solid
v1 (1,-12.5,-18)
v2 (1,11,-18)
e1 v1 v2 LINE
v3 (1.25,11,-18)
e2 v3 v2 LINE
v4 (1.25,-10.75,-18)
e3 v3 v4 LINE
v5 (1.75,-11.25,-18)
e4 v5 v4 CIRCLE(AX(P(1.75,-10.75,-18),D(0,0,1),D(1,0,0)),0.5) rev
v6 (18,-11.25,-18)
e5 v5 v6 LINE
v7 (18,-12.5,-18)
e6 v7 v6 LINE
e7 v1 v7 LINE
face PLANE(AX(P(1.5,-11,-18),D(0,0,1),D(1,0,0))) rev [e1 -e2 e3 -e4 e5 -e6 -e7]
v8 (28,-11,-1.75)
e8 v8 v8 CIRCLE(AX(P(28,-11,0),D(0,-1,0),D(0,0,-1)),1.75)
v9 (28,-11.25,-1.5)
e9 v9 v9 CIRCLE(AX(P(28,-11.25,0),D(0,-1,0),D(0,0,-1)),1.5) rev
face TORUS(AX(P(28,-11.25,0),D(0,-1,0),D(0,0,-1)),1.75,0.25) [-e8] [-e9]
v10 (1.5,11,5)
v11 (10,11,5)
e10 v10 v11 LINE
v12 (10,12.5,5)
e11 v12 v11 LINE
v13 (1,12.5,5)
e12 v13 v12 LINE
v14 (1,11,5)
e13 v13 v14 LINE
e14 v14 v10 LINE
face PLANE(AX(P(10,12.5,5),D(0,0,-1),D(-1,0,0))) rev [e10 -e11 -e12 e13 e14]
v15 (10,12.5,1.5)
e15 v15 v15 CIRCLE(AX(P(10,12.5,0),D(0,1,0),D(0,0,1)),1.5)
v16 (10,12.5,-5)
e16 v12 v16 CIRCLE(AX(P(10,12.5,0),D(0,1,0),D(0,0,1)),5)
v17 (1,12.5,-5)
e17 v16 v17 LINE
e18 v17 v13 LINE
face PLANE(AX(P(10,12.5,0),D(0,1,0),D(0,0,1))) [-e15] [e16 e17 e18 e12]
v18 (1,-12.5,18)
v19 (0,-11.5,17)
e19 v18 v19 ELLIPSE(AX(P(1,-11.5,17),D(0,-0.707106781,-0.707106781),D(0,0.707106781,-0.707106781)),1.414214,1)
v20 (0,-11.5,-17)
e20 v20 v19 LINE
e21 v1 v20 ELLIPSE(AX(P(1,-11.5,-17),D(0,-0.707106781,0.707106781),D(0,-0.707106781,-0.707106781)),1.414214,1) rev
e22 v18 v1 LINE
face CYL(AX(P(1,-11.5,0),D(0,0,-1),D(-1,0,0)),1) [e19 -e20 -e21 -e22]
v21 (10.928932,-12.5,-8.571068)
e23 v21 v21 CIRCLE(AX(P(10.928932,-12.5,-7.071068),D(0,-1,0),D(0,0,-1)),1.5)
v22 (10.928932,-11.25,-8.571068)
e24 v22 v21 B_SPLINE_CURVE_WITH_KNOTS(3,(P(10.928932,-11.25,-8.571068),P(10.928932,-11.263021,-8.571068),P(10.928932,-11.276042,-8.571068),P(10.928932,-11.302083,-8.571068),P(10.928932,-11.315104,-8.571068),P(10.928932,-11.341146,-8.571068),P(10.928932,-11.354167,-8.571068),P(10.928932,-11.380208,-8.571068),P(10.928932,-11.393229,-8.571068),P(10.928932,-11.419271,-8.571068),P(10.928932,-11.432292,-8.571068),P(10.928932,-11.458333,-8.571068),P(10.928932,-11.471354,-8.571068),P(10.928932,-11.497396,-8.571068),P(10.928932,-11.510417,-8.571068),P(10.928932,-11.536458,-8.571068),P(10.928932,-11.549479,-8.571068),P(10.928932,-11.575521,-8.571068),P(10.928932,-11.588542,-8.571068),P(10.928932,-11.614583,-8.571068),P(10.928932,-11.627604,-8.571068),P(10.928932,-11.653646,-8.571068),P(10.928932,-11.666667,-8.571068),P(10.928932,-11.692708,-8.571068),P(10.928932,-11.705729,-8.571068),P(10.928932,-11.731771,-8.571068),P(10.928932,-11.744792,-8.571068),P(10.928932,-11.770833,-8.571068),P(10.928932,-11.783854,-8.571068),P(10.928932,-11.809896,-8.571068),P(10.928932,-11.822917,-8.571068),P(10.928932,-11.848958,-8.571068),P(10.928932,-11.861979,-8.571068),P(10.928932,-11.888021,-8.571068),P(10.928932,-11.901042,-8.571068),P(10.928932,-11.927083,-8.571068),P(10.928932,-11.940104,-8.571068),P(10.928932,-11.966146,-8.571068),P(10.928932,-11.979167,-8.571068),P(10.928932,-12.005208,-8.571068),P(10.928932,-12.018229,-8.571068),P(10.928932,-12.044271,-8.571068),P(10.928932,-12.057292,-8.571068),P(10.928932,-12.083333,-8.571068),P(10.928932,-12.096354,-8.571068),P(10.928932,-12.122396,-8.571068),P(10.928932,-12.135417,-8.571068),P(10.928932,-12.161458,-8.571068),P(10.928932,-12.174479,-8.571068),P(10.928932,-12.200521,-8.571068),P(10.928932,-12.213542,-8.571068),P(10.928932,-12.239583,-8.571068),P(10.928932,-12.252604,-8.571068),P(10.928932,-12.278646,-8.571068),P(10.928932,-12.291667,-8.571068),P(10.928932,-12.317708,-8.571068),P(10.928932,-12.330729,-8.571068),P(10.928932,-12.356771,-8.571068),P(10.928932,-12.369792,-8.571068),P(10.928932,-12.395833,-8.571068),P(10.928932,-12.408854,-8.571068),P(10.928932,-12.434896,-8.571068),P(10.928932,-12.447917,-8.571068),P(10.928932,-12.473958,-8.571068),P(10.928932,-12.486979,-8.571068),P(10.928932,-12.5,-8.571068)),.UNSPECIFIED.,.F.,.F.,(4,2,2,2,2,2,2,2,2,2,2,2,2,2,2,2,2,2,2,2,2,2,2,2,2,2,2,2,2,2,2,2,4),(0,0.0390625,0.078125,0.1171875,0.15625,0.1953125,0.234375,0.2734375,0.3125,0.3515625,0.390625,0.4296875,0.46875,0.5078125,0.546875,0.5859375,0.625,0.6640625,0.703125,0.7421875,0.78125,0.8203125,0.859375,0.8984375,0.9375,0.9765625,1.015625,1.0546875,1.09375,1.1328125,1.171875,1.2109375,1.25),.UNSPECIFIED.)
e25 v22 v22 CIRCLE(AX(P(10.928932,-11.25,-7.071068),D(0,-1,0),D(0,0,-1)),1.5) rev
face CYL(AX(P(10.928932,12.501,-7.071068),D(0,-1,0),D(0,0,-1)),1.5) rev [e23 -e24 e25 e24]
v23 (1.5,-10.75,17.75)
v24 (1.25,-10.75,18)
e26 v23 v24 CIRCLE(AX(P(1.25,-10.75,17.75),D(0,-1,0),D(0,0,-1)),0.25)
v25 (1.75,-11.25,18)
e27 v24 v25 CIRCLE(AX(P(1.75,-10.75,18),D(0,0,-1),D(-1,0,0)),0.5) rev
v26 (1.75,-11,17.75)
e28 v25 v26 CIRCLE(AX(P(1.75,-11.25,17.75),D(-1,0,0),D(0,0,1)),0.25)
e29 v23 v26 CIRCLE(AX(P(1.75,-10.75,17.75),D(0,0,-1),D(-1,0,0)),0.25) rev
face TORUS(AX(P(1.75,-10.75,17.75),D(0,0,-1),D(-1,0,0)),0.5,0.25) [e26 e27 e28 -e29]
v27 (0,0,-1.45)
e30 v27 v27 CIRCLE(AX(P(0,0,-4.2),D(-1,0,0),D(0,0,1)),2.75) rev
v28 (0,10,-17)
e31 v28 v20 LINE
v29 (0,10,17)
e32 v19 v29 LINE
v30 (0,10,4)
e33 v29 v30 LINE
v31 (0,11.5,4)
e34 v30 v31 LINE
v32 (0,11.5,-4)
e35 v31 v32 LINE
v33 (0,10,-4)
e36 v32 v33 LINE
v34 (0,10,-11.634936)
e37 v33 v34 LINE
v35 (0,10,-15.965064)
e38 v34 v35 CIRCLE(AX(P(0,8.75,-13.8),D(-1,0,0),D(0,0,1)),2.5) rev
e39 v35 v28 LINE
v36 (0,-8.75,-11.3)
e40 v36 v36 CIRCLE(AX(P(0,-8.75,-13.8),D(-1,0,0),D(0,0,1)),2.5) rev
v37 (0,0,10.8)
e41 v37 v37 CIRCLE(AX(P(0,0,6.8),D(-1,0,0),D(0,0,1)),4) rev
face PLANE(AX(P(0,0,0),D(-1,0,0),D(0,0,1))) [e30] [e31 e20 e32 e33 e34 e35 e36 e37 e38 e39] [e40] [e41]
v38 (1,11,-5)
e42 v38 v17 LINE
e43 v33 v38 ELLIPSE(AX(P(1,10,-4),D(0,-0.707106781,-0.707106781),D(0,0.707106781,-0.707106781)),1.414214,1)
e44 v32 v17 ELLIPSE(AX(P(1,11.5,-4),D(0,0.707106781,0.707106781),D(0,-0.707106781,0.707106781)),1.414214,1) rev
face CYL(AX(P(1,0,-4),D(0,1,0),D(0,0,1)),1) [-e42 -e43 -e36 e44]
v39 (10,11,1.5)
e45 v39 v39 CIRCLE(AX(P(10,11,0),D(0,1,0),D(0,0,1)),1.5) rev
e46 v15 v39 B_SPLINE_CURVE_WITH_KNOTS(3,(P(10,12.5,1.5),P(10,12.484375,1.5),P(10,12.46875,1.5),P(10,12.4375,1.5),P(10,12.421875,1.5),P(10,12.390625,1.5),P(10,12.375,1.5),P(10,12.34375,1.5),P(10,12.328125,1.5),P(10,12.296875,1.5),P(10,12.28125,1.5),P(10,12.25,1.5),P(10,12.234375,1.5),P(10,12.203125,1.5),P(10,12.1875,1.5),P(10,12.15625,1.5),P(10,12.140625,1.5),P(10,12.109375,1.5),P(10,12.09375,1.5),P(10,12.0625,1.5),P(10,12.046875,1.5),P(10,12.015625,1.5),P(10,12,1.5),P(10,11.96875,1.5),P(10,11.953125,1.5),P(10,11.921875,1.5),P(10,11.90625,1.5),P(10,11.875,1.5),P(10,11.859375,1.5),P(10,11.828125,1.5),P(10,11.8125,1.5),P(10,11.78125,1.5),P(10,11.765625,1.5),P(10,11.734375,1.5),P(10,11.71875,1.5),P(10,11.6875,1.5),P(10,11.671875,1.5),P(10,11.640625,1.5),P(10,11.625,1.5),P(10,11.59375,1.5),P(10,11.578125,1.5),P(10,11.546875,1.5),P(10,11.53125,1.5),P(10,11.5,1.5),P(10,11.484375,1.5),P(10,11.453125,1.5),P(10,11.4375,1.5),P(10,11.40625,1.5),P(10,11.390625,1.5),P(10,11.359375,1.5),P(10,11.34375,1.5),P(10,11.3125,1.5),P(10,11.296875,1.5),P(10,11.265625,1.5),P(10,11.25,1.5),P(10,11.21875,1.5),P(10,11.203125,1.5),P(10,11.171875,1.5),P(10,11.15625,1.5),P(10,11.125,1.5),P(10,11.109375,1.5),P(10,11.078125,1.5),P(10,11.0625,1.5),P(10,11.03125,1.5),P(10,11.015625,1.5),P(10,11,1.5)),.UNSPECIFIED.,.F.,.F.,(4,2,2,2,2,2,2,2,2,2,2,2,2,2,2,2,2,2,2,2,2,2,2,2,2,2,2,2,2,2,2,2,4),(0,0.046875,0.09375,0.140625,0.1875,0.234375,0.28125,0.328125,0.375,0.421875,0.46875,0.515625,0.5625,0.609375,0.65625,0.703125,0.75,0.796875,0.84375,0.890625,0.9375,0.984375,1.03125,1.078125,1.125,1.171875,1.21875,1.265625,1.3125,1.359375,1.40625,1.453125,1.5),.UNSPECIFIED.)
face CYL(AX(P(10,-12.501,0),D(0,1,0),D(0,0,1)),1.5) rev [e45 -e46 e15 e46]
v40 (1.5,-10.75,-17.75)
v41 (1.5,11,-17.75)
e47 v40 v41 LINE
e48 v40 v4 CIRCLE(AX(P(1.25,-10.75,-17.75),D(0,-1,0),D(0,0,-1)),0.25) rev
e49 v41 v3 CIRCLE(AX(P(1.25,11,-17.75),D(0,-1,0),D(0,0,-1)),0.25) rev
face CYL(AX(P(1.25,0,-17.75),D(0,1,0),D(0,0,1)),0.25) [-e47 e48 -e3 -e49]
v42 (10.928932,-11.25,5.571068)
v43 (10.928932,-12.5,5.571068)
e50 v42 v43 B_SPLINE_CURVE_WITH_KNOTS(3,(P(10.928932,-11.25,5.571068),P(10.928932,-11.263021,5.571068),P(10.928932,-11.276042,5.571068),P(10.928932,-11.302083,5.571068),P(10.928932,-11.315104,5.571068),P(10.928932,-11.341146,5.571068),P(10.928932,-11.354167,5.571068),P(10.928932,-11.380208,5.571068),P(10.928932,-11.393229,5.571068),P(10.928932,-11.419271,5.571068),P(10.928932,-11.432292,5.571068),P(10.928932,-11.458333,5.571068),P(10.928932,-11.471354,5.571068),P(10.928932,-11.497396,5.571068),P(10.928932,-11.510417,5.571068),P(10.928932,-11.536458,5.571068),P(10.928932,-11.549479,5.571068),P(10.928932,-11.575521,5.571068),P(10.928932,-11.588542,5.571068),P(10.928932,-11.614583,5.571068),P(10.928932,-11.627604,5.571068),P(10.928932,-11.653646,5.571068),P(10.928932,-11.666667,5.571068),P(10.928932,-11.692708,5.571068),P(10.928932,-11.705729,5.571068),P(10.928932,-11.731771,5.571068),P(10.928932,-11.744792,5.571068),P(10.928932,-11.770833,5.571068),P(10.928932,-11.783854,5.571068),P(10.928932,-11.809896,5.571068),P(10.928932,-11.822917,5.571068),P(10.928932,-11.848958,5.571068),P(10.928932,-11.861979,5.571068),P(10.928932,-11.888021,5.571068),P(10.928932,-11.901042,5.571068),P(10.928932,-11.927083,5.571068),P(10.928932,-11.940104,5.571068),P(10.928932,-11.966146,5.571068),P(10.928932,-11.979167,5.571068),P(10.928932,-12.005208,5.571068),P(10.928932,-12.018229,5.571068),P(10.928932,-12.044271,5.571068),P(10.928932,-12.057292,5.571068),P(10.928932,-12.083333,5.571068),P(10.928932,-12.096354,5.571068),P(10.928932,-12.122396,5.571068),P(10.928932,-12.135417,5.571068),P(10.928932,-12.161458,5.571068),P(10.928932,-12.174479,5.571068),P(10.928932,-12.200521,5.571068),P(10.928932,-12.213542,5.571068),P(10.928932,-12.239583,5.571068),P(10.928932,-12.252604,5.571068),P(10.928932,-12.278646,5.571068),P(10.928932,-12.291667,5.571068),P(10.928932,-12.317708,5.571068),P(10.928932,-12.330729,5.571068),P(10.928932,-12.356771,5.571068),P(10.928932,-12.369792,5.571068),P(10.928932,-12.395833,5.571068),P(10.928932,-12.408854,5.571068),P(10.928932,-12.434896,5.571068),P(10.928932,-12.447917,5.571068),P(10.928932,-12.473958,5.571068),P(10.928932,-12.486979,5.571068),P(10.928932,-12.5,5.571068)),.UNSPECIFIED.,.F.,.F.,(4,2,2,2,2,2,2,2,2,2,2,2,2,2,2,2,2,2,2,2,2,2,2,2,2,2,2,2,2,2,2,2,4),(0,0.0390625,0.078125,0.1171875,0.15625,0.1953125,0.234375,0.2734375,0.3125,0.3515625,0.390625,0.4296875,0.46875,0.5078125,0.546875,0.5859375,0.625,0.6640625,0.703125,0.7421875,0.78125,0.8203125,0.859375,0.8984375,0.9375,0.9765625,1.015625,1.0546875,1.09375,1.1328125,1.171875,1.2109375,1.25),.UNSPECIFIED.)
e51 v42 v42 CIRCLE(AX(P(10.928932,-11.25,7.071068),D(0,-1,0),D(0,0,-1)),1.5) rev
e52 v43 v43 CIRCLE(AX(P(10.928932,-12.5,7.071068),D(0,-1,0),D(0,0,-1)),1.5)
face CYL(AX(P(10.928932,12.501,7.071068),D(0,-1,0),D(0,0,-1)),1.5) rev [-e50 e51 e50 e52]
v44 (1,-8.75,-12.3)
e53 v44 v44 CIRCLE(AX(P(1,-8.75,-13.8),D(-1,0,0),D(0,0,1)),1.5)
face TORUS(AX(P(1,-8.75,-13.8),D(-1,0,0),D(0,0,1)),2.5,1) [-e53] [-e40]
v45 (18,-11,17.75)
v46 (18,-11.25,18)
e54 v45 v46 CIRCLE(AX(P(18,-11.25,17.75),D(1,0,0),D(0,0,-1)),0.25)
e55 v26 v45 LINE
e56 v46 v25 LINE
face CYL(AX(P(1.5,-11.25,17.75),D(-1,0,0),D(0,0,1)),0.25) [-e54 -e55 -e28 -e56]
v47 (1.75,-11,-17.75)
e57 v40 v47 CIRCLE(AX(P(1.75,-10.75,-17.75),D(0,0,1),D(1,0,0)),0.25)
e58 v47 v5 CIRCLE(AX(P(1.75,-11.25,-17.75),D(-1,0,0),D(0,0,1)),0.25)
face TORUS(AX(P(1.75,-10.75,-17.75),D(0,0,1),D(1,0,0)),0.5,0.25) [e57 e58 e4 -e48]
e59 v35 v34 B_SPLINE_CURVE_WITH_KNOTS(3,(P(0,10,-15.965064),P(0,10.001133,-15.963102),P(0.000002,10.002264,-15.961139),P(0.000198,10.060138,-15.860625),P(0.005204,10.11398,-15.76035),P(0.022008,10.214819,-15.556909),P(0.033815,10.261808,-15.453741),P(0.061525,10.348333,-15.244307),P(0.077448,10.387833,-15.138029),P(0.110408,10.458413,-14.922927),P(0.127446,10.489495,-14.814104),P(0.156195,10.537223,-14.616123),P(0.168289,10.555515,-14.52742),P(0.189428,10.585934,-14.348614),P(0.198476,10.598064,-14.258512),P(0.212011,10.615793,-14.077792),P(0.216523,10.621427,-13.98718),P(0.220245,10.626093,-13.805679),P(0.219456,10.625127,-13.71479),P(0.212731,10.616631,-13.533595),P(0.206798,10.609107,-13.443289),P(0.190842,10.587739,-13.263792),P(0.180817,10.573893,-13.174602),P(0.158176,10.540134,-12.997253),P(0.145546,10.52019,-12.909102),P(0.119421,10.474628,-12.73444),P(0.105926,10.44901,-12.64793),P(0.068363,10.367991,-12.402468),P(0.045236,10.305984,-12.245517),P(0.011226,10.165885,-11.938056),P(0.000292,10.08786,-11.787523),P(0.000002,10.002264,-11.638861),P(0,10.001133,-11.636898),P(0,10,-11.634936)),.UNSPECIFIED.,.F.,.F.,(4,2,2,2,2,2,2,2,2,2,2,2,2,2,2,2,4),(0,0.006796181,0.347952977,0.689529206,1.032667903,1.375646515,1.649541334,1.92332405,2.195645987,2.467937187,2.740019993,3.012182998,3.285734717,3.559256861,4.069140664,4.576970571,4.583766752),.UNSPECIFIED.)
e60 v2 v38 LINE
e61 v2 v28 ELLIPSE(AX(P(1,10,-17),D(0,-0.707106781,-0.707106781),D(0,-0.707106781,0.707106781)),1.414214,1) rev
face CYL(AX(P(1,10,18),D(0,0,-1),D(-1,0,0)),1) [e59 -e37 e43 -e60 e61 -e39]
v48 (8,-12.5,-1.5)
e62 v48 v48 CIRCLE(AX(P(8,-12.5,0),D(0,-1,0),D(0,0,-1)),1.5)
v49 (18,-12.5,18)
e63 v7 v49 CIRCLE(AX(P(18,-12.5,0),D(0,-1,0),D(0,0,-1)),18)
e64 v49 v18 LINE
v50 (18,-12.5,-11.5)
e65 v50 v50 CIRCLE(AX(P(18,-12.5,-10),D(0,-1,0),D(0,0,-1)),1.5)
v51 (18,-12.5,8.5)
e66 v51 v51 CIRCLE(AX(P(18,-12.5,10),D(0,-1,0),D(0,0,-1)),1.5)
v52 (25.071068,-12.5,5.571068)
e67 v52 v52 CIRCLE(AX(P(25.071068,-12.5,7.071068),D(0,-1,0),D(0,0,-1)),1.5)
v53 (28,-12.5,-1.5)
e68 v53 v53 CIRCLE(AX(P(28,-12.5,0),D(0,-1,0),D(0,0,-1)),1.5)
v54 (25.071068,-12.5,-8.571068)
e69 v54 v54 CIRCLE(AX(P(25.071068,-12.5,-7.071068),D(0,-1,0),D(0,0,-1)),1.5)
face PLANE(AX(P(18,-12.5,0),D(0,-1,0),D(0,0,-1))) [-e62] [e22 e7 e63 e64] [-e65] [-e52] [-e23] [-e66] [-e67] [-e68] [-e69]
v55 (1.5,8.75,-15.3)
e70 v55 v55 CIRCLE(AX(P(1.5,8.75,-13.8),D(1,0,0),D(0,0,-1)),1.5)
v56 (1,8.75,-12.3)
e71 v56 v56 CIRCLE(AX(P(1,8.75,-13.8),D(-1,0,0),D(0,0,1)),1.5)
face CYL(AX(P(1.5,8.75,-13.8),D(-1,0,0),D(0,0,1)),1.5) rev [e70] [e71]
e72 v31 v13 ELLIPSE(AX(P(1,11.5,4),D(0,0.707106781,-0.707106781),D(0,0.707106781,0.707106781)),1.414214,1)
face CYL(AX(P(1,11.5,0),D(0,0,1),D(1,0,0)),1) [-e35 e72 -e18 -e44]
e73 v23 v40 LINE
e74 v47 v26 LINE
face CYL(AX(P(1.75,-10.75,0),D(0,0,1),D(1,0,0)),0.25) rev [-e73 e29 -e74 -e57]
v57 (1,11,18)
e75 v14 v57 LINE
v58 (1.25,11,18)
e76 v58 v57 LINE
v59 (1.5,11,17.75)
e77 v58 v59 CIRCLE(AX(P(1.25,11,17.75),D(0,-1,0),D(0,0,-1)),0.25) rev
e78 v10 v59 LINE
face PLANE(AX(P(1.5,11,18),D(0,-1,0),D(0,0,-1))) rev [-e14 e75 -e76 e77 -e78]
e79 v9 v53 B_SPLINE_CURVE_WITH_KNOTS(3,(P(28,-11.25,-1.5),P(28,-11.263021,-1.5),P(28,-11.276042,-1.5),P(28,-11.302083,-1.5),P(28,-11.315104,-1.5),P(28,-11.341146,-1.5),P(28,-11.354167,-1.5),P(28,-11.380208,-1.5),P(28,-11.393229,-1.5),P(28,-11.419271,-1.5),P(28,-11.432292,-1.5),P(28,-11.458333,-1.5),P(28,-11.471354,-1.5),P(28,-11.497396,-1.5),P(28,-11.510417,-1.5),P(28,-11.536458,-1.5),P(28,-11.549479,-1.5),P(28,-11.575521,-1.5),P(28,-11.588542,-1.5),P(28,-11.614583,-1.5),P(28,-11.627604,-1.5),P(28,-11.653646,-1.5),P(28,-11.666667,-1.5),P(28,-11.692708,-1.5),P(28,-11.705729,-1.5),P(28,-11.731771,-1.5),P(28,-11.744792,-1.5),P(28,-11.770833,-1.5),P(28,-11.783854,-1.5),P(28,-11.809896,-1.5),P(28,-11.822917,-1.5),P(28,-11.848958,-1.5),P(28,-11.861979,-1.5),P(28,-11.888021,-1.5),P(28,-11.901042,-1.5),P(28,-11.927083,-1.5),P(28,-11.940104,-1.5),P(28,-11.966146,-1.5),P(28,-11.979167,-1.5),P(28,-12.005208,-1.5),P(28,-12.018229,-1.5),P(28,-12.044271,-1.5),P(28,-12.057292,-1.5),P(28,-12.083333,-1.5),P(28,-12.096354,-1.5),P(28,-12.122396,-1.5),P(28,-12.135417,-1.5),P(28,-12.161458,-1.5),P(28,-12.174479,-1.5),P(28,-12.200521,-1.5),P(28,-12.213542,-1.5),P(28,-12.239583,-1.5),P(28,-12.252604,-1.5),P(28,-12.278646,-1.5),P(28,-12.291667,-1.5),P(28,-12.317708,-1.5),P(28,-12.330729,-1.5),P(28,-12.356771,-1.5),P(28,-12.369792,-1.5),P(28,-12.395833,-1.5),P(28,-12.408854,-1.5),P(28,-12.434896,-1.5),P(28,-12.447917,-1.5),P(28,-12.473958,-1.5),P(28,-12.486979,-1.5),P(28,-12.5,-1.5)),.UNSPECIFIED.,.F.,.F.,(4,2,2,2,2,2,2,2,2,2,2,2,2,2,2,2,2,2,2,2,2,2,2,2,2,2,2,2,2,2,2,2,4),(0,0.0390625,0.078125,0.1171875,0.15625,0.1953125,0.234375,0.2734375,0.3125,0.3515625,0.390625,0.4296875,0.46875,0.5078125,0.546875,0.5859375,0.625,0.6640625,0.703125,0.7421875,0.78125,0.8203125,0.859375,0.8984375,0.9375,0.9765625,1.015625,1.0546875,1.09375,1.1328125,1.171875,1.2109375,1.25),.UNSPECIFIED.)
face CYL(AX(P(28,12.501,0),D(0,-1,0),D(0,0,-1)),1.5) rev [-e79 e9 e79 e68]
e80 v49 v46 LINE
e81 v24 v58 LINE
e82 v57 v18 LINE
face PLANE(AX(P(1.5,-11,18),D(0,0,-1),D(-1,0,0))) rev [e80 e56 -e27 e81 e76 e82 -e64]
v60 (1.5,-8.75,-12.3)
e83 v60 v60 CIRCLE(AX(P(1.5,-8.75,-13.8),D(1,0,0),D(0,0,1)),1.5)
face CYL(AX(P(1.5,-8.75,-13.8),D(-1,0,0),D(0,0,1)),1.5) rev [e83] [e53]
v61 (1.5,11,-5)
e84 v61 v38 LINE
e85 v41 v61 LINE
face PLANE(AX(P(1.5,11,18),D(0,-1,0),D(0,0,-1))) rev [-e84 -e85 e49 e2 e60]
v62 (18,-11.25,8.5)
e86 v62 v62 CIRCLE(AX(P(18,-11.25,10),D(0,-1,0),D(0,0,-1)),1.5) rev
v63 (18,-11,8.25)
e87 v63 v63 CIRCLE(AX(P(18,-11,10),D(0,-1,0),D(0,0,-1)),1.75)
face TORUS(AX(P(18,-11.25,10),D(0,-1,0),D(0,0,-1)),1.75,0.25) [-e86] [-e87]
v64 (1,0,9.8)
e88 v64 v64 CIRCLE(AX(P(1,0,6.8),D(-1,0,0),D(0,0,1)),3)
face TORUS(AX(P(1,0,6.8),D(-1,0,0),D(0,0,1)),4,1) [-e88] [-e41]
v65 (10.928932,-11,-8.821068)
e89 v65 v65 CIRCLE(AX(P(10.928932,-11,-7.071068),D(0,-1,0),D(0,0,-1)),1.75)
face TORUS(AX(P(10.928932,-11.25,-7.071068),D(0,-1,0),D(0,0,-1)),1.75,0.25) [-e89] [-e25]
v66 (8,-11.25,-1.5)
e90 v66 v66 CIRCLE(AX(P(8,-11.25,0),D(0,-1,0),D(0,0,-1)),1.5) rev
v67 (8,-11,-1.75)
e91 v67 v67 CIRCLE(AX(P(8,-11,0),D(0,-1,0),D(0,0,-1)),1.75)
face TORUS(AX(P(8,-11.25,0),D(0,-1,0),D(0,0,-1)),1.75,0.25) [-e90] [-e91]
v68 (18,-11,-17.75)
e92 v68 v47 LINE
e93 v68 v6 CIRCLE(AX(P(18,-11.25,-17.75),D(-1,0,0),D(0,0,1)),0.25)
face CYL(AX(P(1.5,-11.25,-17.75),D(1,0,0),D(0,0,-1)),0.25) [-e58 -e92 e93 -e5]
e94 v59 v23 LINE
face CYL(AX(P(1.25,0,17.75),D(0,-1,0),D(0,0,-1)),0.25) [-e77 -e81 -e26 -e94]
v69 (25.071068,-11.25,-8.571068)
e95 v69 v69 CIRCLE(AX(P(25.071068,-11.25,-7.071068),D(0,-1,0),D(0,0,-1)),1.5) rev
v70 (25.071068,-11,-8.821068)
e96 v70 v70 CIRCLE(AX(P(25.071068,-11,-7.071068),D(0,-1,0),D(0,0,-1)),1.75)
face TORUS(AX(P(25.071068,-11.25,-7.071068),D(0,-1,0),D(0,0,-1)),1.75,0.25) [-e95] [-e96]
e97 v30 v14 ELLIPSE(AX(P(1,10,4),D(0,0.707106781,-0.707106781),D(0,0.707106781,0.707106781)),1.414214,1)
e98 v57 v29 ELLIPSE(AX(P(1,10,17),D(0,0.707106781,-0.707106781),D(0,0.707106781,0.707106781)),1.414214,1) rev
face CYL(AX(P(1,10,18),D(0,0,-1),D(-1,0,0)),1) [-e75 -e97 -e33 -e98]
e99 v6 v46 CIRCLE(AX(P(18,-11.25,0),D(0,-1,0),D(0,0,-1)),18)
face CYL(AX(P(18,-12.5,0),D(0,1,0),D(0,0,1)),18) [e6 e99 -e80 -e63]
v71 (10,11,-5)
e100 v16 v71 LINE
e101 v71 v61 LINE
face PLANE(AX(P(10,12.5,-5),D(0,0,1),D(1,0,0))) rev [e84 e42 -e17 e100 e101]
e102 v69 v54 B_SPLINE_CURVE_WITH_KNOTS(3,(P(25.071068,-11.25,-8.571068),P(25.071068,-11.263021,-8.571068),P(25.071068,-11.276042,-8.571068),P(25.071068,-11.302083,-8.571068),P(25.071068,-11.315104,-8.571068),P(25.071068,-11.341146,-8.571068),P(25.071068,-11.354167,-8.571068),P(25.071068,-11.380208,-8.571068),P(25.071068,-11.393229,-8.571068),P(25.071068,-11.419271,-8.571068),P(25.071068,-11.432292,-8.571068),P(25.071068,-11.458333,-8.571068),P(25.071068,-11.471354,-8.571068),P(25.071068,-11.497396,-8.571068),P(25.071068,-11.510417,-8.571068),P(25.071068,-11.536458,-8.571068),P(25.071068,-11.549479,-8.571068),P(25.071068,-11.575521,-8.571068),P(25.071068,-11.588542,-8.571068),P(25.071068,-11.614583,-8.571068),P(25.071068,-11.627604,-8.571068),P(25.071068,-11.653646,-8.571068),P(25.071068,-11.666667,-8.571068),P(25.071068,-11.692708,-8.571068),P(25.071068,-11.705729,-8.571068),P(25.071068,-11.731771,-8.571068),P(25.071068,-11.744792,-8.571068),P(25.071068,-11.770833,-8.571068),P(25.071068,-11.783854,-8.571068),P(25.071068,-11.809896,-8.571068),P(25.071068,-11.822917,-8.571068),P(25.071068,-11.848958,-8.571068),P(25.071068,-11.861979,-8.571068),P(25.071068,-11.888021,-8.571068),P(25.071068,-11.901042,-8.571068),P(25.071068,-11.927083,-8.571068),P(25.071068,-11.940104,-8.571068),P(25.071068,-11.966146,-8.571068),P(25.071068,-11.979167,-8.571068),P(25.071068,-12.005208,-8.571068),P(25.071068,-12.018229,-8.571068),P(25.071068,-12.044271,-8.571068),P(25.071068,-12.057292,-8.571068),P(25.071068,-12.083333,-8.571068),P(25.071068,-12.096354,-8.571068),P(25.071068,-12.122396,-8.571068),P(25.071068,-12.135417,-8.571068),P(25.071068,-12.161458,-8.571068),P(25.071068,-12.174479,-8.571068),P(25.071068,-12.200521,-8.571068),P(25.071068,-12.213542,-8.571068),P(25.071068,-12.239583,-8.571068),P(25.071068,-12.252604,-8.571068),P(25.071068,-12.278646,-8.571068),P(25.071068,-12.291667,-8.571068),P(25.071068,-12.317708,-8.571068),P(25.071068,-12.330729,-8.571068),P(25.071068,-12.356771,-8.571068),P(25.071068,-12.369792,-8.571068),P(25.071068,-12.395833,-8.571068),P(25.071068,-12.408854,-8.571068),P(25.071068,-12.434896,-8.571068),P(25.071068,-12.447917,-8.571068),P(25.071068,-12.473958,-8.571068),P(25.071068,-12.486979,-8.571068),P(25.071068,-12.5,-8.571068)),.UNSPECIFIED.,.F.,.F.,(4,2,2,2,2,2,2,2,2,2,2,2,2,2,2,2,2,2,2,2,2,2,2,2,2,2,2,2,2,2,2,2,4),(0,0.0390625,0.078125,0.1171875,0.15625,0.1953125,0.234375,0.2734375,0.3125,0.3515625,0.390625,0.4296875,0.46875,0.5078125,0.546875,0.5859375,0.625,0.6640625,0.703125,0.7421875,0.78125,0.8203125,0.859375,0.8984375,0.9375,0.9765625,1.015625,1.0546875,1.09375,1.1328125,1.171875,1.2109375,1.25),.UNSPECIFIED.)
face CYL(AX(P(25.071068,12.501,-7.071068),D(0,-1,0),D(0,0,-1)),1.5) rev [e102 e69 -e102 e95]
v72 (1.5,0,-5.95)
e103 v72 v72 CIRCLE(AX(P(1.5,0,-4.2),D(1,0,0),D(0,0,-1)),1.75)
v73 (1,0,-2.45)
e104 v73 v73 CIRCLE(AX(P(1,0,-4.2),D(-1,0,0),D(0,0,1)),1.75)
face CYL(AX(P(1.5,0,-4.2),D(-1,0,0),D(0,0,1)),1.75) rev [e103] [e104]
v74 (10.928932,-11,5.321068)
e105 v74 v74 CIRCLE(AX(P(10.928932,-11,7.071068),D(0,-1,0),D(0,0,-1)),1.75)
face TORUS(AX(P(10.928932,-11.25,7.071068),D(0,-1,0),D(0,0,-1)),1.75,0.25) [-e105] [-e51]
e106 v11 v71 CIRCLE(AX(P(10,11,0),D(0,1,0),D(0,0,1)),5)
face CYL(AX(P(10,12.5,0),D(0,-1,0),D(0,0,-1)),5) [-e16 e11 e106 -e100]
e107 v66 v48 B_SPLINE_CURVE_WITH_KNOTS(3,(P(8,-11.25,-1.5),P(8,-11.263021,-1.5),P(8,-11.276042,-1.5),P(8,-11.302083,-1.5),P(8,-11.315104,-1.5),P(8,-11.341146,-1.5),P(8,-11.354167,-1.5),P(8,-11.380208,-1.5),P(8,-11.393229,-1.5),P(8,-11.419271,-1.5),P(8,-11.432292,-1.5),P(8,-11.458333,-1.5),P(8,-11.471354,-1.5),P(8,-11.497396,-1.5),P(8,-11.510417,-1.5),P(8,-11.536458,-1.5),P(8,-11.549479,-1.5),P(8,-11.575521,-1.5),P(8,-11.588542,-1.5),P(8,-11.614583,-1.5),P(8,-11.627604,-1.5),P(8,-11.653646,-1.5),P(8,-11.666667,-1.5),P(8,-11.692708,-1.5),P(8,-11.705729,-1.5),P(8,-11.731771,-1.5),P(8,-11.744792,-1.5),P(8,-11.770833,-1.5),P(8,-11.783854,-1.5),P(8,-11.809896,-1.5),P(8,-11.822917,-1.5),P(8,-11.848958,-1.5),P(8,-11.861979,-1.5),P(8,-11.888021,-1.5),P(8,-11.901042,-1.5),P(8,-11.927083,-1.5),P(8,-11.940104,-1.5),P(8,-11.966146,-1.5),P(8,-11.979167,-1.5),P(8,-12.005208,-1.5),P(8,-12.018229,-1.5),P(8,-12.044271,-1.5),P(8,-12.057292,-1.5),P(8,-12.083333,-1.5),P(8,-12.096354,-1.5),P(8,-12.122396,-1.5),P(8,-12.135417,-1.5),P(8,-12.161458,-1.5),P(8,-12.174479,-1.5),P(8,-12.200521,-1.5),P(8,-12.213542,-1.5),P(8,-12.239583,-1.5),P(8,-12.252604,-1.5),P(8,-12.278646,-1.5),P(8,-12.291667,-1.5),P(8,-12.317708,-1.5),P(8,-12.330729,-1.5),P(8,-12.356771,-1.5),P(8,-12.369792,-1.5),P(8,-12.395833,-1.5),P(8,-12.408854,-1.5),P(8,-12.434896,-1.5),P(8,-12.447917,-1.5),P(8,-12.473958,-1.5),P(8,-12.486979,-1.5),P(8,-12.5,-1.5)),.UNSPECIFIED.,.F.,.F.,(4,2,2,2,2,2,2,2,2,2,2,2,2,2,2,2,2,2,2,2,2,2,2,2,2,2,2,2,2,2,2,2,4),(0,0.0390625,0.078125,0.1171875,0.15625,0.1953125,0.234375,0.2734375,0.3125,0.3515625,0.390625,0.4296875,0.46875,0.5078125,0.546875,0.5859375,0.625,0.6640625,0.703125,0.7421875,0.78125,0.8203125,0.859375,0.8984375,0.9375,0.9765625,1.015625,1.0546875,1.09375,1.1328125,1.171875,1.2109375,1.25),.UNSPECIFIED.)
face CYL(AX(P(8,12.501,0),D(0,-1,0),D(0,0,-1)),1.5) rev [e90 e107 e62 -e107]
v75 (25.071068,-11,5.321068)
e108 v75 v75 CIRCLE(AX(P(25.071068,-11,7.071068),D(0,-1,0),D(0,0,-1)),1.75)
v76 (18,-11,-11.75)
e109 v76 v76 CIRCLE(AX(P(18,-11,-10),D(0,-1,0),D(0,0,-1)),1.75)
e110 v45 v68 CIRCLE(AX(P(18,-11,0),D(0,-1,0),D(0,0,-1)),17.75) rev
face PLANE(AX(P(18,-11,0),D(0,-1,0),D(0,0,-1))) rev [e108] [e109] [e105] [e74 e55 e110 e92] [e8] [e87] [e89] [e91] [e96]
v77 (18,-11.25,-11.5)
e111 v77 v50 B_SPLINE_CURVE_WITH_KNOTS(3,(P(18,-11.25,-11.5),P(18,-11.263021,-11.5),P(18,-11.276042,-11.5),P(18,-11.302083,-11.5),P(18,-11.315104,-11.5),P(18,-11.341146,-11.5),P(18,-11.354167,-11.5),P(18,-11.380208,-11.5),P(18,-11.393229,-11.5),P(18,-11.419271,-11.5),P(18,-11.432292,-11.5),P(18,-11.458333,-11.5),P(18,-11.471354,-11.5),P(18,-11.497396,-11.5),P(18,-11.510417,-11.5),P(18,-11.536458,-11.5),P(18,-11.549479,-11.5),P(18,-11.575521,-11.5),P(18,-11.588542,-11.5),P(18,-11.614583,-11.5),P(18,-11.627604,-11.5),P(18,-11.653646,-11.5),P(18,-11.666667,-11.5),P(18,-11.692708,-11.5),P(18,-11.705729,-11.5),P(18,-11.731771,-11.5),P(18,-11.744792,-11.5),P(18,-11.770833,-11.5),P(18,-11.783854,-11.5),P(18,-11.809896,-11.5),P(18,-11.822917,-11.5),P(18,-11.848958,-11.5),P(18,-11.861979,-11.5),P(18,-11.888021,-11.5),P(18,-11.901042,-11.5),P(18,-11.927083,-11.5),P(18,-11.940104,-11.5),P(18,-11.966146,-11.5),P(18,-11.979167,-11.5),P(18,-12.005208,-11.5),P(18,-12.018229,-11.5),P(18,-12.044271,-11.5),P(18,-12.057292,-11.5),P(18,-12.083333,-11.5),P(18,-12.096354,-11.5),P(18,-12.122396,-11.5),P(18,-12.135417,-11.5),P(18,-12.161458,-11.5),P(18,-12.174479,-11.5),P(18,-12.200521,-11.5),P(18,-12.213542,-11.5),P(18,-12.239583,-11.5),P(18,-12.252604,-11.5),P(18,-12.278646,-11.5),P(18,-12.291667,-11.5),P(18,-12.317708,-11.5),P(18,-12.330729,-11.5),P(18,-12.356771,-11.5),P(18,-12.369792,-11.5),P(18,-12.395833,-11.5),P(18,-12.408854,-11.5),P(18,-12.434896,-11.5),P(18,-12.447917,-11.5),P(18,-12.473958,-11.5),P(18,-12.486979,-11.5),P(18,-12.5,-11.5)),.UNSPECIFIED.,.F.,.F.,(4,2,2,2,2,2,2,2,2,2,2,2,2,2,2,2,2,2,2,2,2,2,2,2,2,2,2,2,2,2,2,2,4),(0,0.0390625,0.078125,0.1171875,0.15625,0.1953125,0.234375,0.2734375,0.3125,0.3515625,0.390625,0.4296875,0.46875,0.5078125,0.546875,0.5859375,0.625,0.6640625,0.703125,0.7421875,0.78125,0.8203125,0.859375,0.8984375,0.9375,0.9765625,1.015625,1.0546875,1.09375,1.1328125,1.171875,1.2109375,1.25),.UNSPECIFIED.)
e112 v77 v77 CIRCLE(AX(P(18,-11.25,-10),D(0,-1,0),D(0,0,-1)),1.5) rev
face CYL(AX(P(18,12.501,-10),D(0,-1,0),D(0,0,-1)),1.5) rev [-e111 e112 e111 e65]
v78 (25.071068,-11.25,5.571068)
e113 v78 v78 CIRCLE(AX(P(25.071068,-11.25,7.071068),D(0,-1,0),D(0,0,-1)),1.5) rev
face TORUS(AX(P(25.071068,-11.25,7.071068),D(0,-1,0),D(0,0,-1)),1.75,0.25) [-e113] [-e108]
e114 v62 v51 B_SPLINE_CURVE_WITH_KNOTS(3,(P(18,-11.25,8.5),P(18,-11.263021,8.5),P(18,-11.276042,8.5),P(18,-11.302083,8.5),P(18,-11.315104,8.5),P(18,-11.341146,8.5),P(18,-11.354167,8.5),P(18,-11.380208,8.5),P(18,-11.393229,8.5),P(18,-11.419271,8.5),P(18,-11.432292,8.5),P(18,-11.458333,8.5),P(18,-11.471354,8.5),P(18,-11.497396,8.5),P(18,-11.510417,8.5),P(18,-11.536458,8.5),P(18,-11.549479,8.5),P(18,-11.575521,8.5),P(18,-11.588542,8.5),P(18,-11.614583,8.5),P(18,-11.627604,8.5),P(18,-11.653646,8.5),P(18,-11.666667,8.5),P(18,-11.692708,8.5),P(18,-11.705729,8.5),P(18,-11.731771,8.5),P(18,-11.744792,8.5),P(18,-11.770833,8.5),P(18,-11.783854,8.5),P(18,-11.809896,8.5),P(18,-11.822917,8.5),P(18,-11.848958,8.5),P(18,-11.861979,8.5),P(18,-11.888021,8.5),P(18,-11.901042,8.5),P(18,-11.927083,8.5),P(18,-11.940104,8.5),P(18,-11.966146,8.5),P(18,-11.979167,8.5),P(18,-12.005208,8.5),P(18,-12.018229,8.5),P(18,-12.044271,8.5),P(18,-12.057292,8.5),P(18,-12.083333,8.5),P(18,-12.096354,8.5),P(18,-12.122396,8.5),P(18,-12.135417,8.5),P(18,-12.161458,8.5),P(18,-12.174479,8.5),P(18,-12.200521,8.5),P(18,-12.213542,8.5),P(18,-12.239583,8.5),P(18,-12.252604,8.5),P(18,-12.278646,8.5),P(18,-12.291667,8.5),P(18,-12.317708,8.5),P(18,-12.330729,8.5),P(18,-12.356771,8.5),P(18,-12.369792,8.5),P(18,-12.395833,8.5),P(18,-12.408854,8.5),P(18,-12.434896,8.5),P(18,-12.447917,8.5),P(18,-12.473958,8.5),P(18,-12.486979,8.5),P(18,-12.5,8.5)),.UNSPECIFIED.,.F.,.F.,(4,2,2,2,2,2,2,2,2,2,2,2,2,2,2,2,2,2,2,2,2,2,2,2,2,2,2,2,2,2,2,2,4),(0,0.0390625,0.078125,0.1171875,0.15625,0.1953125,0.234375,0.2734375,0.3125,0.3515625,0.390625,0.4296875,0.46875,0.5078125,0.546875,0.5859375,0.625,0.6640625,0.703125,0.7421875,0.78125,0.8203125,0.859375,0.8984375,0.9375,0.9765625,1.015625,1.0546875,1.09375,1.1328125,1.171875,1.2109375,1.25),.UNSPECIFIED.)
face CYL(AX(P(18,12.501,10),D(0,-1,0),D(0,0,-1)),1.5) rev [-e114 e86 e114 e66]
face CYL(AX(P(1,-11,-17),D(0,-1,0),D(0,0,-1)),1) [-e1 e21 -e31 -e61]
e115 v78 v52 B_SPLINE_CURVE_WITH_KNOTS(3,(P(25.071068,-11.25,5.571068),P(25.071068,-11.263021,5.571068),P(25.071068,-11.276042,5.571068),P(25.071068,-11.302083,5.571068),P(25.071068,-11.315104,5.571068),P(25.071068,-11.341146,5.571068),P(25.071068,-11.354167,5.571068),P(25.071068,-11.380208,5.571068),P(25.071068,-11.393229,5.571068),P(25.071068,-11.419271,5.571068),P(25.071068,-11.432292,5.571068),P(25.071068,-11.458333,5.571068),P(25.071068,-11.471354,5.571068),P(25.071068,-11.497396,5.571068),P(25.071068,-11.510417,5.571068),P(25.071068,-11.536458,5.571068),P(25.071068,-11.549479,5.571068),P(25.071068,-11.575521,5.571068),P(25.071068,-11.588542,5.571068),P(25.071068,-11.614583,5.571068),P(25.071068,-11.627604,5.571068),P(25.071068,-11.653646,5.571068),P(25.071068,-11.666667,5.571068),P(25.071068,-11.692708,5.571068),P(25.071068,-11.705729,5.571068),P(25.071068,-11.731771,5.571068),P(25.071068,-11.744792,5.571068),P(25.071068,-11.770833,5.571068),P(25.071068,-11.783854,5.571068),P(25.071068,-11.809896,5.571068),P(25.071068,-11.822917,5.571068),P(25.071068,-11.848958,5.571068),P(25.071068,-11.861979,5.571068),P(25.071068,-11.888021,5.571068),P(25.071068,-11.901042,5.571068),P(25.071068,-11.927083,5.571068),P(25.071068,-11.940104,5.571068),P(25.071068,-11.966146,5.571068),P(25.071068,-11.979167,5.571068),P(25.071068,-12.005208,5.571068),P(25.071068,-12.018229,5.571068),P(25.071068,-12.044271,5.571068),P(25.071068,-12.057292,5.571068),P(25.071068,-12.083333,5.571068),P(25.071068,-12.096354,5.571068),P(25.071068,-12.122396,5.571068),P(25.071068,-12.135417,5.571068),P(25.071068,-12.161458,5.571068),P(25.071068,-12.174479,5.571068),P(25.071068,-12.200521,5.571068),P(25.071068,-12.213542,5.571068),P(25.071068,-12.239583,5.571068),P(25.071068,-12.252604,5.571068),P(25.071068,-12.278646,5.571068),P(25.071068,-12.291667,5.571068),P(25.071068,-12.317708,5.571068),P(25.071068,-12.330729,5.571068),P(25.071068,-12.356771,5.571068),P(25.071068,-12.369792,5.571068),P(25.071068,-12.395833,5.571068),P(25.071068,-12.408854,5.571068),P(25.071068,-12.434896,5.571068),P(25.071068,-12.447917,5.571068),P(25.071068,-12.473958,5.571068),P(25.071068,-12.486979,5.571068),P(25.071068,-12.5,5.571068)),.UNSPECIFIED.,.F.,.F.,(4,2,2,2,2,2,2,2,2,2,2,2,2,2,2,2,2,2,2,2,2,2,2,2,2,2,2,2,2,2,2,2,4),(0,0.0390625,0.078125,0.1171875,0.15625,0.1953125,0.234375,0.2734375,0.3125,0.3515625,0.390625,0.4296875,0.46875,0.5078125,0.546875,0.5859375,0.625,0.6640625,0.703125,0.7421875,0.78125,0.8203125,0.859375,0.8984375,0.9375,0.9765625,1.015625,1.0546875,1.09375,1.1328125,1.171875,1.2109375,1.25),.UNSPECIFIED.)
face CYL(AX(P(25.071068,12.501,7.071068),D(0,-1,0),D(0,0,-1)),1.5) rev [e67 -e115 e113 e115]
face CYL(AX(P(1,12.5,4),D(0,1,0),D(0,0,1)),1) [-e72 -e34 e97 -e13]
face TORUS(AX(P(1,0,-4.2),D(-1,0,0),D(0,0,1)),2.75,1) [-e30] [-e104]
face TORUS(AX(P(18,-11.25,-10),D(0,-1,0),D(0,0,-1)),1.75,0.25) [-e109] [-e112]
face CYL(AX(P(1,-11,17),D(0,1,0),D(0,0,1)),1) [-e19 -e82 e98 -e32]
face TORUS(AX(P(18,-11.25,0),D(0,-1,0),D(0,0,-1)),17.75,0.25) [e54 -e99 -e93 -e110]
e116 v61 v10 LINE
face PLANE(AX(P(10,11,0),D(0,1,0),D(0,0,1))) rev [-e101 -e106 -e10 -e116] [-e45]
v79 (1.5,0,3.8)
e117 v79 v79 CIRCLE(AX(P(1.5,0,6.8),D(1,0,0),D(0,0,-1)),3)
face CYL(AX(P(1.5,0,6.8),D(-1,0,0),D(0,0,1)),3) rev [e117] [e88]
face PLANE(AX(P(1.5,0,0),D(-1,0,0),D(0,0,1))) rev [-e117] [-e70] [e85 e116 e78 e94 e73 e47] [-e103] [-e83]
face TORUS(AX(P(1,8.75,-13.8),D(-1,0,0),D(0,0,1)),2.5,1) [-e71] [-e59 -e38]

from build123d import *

# Parameters (mm, degrees)
CROQUIS1_W              = 36
CROQUIS1_H              = 22
CROQUIS1_R              = 1.5
CROQUIS1_R_2            = 3
CROQUIS1_R_3            = 1.75
SALIENTE_EXTRUIR1_DEPTH = 1.5
SALIENTE_EXTRUIR3_DEPTH = 1.5
SALIENTE_EXTRUIR4_DEPTH = 1.5
CORTAR_EXTRUIR1_REACH   = 49.381
CROQUIS5_R              = 1.5
CORTAR_EXTRUIR2_REACH   = 49.381
CROQUIS7_R              = 1.5
REDONDEO2_R             = 1
REDONDEO3_R             = 0.25


with BuildPart() as part:
    # Croquis1 → Saliente-Extruir1 (new body)
    with BuildSketch(Plane(origin=(0, 0, 0), x_dir=(0, 0, -1), z_dir=(1, 0, 0))):
        Rectangle(CROQUIS1_W, CROQUIS1_H)
        with Locations((13.8, 8.75)):
            Circle(CROQUIS1_R, mode=Mode.SUBTRACT)
        with Locations((-6.8, 0)):
            Circle(CROQUIS1_R_2, mode=Mode.SUBTRACT)
        with Locations(Location((13.8, -8.75, 0), (0, 0, 180))):
            Circle(CROQUIS1_R, mode=Mode.SUBTRACT)
        with Locations((4.2, 0)):
            Circle(CROQUIS1_R_3, mode=Mode.SUBTRACT)
    extrude(amount=SALIENTE_EXTRUIR1_DEPTH)

    # Croquis3<2> → Saliente-Extruir3 (add)
    with BuildSketch(Plane.XZ.offset(11)):
        with BuildLine():
            Line((18, -18), (0, -18))
            Line((0, -18), (0, 18))
            Line((0, 18), (18, 18))
            ThreePointArc((18, 18), (36, 0), (18, -18))
        make_face()
    extrude(amount=SALIENTE_EXTRUIR3_DEPTH)

    # Croquis4 → Saliente-Extruir4 (add)
    with BuildSketch(Plane(origin=(0, 11, 0), x_dir=(1, 0, 0), z_dir=(0, 1, 0))):
        with BuildLine():
            Line((10, 5), (0, 5))
            Line((0, 5), (0, -5))
            Line((0, -5), (10, -5))
            ThreePointArc((10, -5), (15, 0), (10, 5))
        make_face()
    extrude(amount=SALIENTE_EXTRUIR4_DEPTH)

    # Croquis5 → Cortar-Extruir1 (cut, up to next)
    with BuildSketch(Plane(origin=(0, 12.5, 0), x_dir=(1, 0, 0), z_dir=(0, 1, 0)), mode=Mode.PRIVATE) as cortar_extruir1_sk1:
        with Locations(Location((10, 0, 0), (0, 0, 270))):
            Circle(CROQUIS5_R)
    cortar_extruir1_tool1 = extrude(cortar_extruir1_sk1.sketch, amount=-CORTAR_EXTRUIR1_REACH, mode=Mode.PRIVATE) & part.part
    add(cortar_extruir1_tool1.solids().sort_by_distance((10, 12.5, 0))[0], mode=Mode.SUBTRACT)

    # Croquis7 → Cortar-Extruir2 (cut, up to next)
    with BuildSketch(Plane.XZ.offset(12.5), mode=Mode.PRIVATE) as cortar_extruir2_sk1:
        with Locations(Location((28, 0, 0), (0, 0, 270))):
            Circle(CROQUIS7_R)
    cortar_extruir2_tool1 = extrude(cortar_extruir2_sk1.sketch, amount=-CORTAR_EXTRUIR2_REACH, mode=Mode.PRIVATE) & part.part
    # Croquis7 → Cortar-Extruir2 (cut, up to next)
    with BuildSketch(Plane.XZ.offset(12.5), mode=Mode.PRIVATE) as cortar_extruir2_sk2:
        with Locations(Location((25.071067812, -7.071067812, 0), (0, 0, 270))):
            Circle(CROQUIS7_R)
    cortar_extruir2_tool2 = extrude(cortar_extruir2_sk2.sketch, amount=-CORTAR_EXTRUIR2_REACH, mode=Mode.PRIVATE) & part.part
    # Croquis7 → Cortar-Extruir2 (cut, up to next)
    with BuildSketch(Plane.XZ.offset(12.5), mode=Mode.PRIVATE) as cortar_extruir2_sk3:
        with Locations(Location((18, -10, 0), (0, 0, 270))):
            Circle(CROQUIS7_R)
    cortar_extruir2_tool3 = extrude(cortar_extruir2_sk3.sketch, amount=-CORTAR_EXTRUIR2_REACH, mode=Mode.PRIVATE) & part.part
    # Croquis7 → Cortar-Extruir2 (cut, up to next)
    with BuildSketch(Plane.XZ.offset(12.5), mode=Mode.PRIVATE) as cortar_extruir2_sk4:
        with Locations(Location((10.928932188, -7.071067812, 0), (0, 0, 270))):
            Circle(CROQUIS7_R)
    cortar_extruir2_tool4 = extrude(cortar_extruir2_sk4.sketch, amount=-CORTAR_EXTRUIR2_REACH, mode=Mode.PRIVATE) & part.part
    # Croquis7 → Cortar-Extruir2 (cut, up to next)
    with BuildSketch(Plane.XZ.offset(12.5), mode=Mode.PRIVATE) as cortar_extruir2_sk5:
        with Locations(Location((8, 0, 0), (0, 0, 270))):
            Circle(CROQUIS7_R)
    cortar_extruir2_tool5 = extrude(cortar_extruir2_sk5.sketch, amount=-CORTAR_EXTRUIR2_REACH, mode=Mode.PRIVATE) & part.part
    # Croquis7 → Cortar-Extruir2 (cut, up to next)
    with BuildSketch(Plane.XZ.offset(12.5), mode=Mode.PRIVATE) as cortar_extruir2_sk6:
        with Locations(Location((10.928932188, 7.071067812, 0), (0, 0, 270))):
            Circle(CROQUIS7_R)
    cortar_extruir2_tool6 = extrude(cortar_extruir2_sk6.sketch, amount=-CORTAR_EXTRUIR2_REACH, mode=Mode.PRIVATE) & part.part
    # Croquis7 → Cortar-Extruir2 (cut, up to next)
    with BuildSketch(Plane.XZ.offset(12.5), mode=Mode.PRIVATE) as cortar_extruir2_sk7:
        with Locations(Location((18, 10, 0), (0, 0, 270))):
            Circle(CROQUIS7_R)
    cortar_extruir2_tool7 = extrude(cortar_extruir2_sk7.sketch, amount=-CORTAR_EXTRUIR2_REACH, mode=Mode.PRIVATE) & part.part
    # Croquis7 → Cortar-Extruir2 (cut, up to next)
    with BuildSketch(Plane.XZ.offset(12.5), mode=Mode.PRIVATE) as cortar_extruir2_sk8:
        with Locations(Location((25.071067812, 7.071067812, 0), (0, 0, 270))):
            Circle(CROQUIS7_R)
    cortar_extruir2_tool8 = extrude(cortar_extruir2_sk8.sketch, amount=-CORTAR_EXTRUIR2_REACH, mode=Mode.PRIVATE) & part.part
    add(cortar_extruir2_tool1.solids().sort_by_distance((28, -12.5, 0))[0], mode=Mode.SUBTRACT)
    add(cortar_extruir2_tool2.solids().sort_by_distance((25.071068, -12.5, -7.071068))[0], mode=Mode.SUBTRACT)
    add(cortar_extruir2_tool3.solids().sort_by_distance((18, -12.5, -10))[0], mode=Mode.SUBTRACT)
    add(cortar_extruir2_tool4.solids().sort_by_distance((10.928932, -12.5, -7.071068))[0], mode=Mode.SUBTRACT)
    add(cortar_extruir2_tool5.solids().sort_by_distance((8, -12.5, 0))[0], mode=Mode.SUBTRACT)
    add(cortar_extruir2_tool6.solids().sort_by_distance((10.928932, -12.5, 7.071068))[0], mode=Mode.SUBTRACT)
    add(cortar_extruir2_tool7.solids().sort_by_distance((18, -12.5, 10))[0], mode=Mode.SUBTRACT)
    add(cortar_extruir2_tool8.solids().sort_by_distance((25.071068, -12.5, 7.071068))[0], mode=Mode.SUBTRACT)

    # Redondeo2
    # the kernel refuses this fillet: 1 mm, written as the material it takes off along each edge
    with BuildSketch(Plane(origin=(0, 8.75, -13.8), x_dir=(0, 0, -1), z_dir=(0, -1, 0))) as redondeo2_piece_1:
        with BuildLine():
            CenterArc((1.5 + REDONDEO2_R, REDONDEO2_R), REDONDEO2_R, 180, 90)
            Line((1.5, REDONDEO2_R), (1.5, 0))
            Line((1.5, 0), (1.5 + REDONDEO2_R, 0))
        make_face()
    revolve(axis=Axis((0, 8.75, -13.8), (1, 0, 0)), mode=Mode.SUBTRACT)
    with BuildSketch(Plane(origin=(0, 0, 6.8), x_dir=(0, 0, -1), z_dir=(0, -1, 0))) as redondeo2_piece_2:
        with BuildLine():
            CenterArc((3 + REDONDEO2_R, REDONDEO2_R), REDONDEO2_R, 180, 90)
            Line((3, REDONDEO2_R), (3, 0))
            Line((3, 0), (3 + REDONDEO2_R, 0))
        make_face()
    revolve(axis=Axis((0, 0, 6.8), (1, 0, 0)), mode=Mode.SUBTRACT)
    with BuildSketch(Plane(origin=(0, -8.75, -13.8), x_dir=(0, 0, 1), z_dir=(0, 1, 0))) as redondeo2_piece_3:
        with BuildLine():
            CenterArc((1.5 + REDONDEO2_R, REDONDEO2_R), REDONDEO2_R, 180, 90)
            Line((1.5, REDONDEO2_R), (1.5, 0))
            Line((1.5, 0), (1.5 + REDONDEO2_R, 0))
        make_face()
    revolve(axis=Axis((0, -8.75, -13.8), (1, 0, 0)), mode=Mode.SUBTRACT)
    with BuildSketch(Plane(origin=(0, 0, -4.2), x_dir=(0, 0, -1), z_dir=(0, -1, 0))) as redondeo2_piece_4:
        with BuildLine():
            CenterArc((1.75 + REDONDEO2_R, REDONDEO2_R), REDONDEO2_R, 180, 90)
            Line((1.75, REDONDEO2_R), (1.75, 0))
            Line((1.75, 0), (1.75 + REDONDEO2_R, 0))
        make_face()
    revolve(axis=Axis((0, 0, -4.2), (1, 0, 0)), mode=Mode.SUBTRACT)
    with BuildSketch(Plane(origin=(0, -12.5, -20.5), x_dir=(0, 1, 0), z_dir=(0, 0, 1))) as redondeo2_piece_5:
        with BuildLine():
            CenterArc((REDONDEO2_R, -REDONDEO2_R), REDONDEO2_R, 90, 90)
            Line((0, -REDONDEO2_R), (0, 0))
            Line((0, 0), (REDONDEO2_R, 0))
        make_face()
    extrude(amount=41, mode=Mode.SUBTRACT)
    with BuildSketch(Plane(origin=(0, 11, 5), x_dir=(0, -1, 0), z_dir=(0, 0, 1))) as redondeo2_piece_6:
        with BuildLine():
            CenterArc((REDONDEO2_R, REDONDEO2_R), REDONDEO2_R, 180, 90)
            Line((0, REDONDEO2_R), (0, 0))
            Line((0, 0), (REDONDEO2_R, 0))
        make_face()
    extrude(amount=15.5, mode=Mode.SUBTRACT)
    with BuildSketch(Plane(origin=(0, 11, -5), x_dir=(0, 0, 1), z_dir=(0, 1, 0))) as redondeo2_piece_7:
        with BuildLine():
            CenterArc((REDONDEO2_R, REDONDEO2_R), REDONDEO2_R, 180, 90)
            Line((0, REDONDEO2_R), (0, 0))
            Line((0, 0), (REDONDEO2_R, 0))
        make_face()
    extrude(amount=4, mode=Mode.SUBTRACT)
    with BuildSketch(Plane(origin=(0, 11, 5), x_dir=(0, 0, -1), z_dir=(0, 1, 0))) as redondeo2_piece_8:
        with BuildLine():
            CenterArc((REDONDEO2_R, -REDONDEO2_R), REDONDEO2_R, 90, 90)
            Line((0, -REDONDEO2_R), (0, 0))
            Line((0, 0), (REDONDEO2_R, 0))
        make_face()
    extrude(amount=4, mode=Mode.SUBTRACT)
    with BuildSketch(Plane(origin=(0, 12.5, -7.5), x_dir=(0, -1, 0), z_dir=(0, 0, 1))) as redondeo2_piece_9:
        with BuildLine():
            CenterArc((REDONDEO2_R, REDONDEO2_R), REDONDEO2_R, 180, 90)
            Line((0, REDONDEO2_R), (0, 0))
            Line((0, 0), (REDONDEO2_R, 0))
        make_face()
    extrude(amount=15, mode=Mode.SUBTRACT)
    with BuildSketch(Plane(origin=(0, -15, 18), x_dir=(0, 0, -1), z_dir=(0, 1, 0)), Plane(origin=(0, -15, -18), x_dir=(1, 0, 0), z_dir=(0, 1, 0))) as redondeo2_piece_10:
        with BuildLine():
            CenterArc((REDONDEO2_R, -REDONDEO2_R), REDONDEO2_R, 90, 90)
            Line((0, -REDONDEO2_R), (0, 0))
            Line((0, 0), (REDONDEO2_R, 0))
        make_face()
    extrude(amount=28.5, mode=Mode.SUBTRACT)
    with BuildSketch(Plane(origin=(0, 11, -20.5), x_dir=(1, 0, 0), z_dir=(0, 0, 1))) as redondeo2_piece_11:
        with BuildLine():
            CenterArc((REDONDEO2_R, -REDONDEO2_R), REDONDEO2_R, 90, 90)
            Line((0, -REDONDEO2_R), (0, 0))
            Line((0, 0), (REDONDEO2_R, 0))
        make_face()
    extrude(amount=15.5, mode=Mode.SUBTRACT)
    with BuildSketch(Plane(origin=(0, 8.5, 5), x_dir=(0, 0, -1), z_dir=(0, 1, 0))) as redondeo2_piece_12a_section:
        with BuildLine():
            CenterArc((REDONDEO2_R, -REDONDEO2_R), REDONDEO2_R, 90, 90)
            Line((0, -REDONDEO2_R), (0, 0))
            Line((0, 0), (REDONDEO2_R, 0))
        make_face()
    redondeo2_piece_12a = extrude(amount=6.5, mode=Mode.PRIVATE)
    redondeo2_piece_12a = split(redondeo2_piece_12a, bisect_by=Plane(origin=(0.226395114, 11, 4.773604886), z_dir=(0, -1, 0)), keep=Keep.TOP, mode=Mode.PRIVATE)
    with BuildSketch(Plane(origin=(0, 11, 2.5), x_dir=(0, -1, 0), z_dir=(0, 0, 1))) as redondeo2_piece_12b_section:
        with BuildLine():
            CenterArc((REDONDEO2_R, REDONDEO2_R), REDONDEO2_R, 180, 90)
            Line((0, REDONDEO2_R), (0, 0))
            Line((0, 0), (REDONDEO2_R, 0))
        make_face()
    redondeo2_piece_12b = extrude(amount=18, mode=Mode.PRIVATE)
    redondeo2_piece_12b = split(redondeo2_piece_12b, bisect_by=Plane(origin=(0.226395114, 10.773604886, 5), z_dir=(0, 0, -1)), keep=Keep.TOP, mode=Mode.PRIVATE)
    redondeo2_piece_12 = redondeo2_piece_12a & redondeo2_piece_12b
    add(redondeo2_piece_12, mode=Mode.SUBTRACT)
    with BuildSketch(Plane(origin=(0, 11, -20.5), x_dir=(1, 0, 0), z_dir=(0, 0, 1))) as redondeo2_piece_13a_section:
        with BuildLine():
            CenterArc((REDONDEO2_R, -REDONDEO2_R), REDONDEO2_R, 90, 90)
            Line((0, -REDONDEO2_R), (0, 0))
            Line((0, 0), (REDONDEO2_R, 0))
        make_face()
    redondeo2_piece_13a = extrude(amount=18, mode=Mode.PRIVATE)
    redondeo2_piece_13a = split(redondeo2_piece_13a, bisect_by=Plane(origin=(0.226395114, 10.773604886, -5), z_dir=(0, 0, 1)), keep=Keep.TOP, mode=Mode.PRIVATE)
    with BuildSketch(Plane(origin=(0, 8.5, -5), x_dir=(0, 0, 1), z_dir=(0, 1, 0))) as redondeo2_piece_13b_section:
        with BuildLine():
            CenterArc((REDONDEO2_R, REDONDEO2_R), REDONDEO2_R, 180, 90)
            Line((0, REDONDEO2_R), (0, 0))
            Line((0, 0), (REDONDEO2_R, 0))
        make_face()
    redondeo2_piece_13b = extrude(amount=6.5, mode=Mode.PRIVATE)
    redondeo2_piece_13b = split(redondeo2_piece_13b, bisect_by=Plane(origin=(0.226395114, 11, -4.773604886), z_dir=(0, -1, 0)), keep=Keep.TOP, mode=Mode.PRIVATE)
    redondeo2_piece_13 = redondeo2_piece_13a & redondeo2_piece_13b
    add(redondeo2_piece_13, mode=Mode.SUBTRACT)

    # Redondeo3
    redondeo3_edges = [part.edges().sort_by_distance(p)[0] for p in [
        (1.5, 0, 18),
        (1.5, -11, 0),
        (36, -11, 0),
        (9.75, -11, 18),
        (9.75, -11, -18),
        (1.5, 0, -18),
        (25.071067812, -11, 8.571067812),
        (18, -11, 11.5),
        (10.928932188, -11, 8.571067812),
        (8, -11, 1.5),
        (10.928932188, -11, -5.571067812),
        (18, -11, -8.5),
        (25.071067812, -11, -5.571067812),
        (28, -11, 1.5),
    ]]
    fillet(redondeo3_edges, radius=REDONDEO3_R)


solid = part.part
